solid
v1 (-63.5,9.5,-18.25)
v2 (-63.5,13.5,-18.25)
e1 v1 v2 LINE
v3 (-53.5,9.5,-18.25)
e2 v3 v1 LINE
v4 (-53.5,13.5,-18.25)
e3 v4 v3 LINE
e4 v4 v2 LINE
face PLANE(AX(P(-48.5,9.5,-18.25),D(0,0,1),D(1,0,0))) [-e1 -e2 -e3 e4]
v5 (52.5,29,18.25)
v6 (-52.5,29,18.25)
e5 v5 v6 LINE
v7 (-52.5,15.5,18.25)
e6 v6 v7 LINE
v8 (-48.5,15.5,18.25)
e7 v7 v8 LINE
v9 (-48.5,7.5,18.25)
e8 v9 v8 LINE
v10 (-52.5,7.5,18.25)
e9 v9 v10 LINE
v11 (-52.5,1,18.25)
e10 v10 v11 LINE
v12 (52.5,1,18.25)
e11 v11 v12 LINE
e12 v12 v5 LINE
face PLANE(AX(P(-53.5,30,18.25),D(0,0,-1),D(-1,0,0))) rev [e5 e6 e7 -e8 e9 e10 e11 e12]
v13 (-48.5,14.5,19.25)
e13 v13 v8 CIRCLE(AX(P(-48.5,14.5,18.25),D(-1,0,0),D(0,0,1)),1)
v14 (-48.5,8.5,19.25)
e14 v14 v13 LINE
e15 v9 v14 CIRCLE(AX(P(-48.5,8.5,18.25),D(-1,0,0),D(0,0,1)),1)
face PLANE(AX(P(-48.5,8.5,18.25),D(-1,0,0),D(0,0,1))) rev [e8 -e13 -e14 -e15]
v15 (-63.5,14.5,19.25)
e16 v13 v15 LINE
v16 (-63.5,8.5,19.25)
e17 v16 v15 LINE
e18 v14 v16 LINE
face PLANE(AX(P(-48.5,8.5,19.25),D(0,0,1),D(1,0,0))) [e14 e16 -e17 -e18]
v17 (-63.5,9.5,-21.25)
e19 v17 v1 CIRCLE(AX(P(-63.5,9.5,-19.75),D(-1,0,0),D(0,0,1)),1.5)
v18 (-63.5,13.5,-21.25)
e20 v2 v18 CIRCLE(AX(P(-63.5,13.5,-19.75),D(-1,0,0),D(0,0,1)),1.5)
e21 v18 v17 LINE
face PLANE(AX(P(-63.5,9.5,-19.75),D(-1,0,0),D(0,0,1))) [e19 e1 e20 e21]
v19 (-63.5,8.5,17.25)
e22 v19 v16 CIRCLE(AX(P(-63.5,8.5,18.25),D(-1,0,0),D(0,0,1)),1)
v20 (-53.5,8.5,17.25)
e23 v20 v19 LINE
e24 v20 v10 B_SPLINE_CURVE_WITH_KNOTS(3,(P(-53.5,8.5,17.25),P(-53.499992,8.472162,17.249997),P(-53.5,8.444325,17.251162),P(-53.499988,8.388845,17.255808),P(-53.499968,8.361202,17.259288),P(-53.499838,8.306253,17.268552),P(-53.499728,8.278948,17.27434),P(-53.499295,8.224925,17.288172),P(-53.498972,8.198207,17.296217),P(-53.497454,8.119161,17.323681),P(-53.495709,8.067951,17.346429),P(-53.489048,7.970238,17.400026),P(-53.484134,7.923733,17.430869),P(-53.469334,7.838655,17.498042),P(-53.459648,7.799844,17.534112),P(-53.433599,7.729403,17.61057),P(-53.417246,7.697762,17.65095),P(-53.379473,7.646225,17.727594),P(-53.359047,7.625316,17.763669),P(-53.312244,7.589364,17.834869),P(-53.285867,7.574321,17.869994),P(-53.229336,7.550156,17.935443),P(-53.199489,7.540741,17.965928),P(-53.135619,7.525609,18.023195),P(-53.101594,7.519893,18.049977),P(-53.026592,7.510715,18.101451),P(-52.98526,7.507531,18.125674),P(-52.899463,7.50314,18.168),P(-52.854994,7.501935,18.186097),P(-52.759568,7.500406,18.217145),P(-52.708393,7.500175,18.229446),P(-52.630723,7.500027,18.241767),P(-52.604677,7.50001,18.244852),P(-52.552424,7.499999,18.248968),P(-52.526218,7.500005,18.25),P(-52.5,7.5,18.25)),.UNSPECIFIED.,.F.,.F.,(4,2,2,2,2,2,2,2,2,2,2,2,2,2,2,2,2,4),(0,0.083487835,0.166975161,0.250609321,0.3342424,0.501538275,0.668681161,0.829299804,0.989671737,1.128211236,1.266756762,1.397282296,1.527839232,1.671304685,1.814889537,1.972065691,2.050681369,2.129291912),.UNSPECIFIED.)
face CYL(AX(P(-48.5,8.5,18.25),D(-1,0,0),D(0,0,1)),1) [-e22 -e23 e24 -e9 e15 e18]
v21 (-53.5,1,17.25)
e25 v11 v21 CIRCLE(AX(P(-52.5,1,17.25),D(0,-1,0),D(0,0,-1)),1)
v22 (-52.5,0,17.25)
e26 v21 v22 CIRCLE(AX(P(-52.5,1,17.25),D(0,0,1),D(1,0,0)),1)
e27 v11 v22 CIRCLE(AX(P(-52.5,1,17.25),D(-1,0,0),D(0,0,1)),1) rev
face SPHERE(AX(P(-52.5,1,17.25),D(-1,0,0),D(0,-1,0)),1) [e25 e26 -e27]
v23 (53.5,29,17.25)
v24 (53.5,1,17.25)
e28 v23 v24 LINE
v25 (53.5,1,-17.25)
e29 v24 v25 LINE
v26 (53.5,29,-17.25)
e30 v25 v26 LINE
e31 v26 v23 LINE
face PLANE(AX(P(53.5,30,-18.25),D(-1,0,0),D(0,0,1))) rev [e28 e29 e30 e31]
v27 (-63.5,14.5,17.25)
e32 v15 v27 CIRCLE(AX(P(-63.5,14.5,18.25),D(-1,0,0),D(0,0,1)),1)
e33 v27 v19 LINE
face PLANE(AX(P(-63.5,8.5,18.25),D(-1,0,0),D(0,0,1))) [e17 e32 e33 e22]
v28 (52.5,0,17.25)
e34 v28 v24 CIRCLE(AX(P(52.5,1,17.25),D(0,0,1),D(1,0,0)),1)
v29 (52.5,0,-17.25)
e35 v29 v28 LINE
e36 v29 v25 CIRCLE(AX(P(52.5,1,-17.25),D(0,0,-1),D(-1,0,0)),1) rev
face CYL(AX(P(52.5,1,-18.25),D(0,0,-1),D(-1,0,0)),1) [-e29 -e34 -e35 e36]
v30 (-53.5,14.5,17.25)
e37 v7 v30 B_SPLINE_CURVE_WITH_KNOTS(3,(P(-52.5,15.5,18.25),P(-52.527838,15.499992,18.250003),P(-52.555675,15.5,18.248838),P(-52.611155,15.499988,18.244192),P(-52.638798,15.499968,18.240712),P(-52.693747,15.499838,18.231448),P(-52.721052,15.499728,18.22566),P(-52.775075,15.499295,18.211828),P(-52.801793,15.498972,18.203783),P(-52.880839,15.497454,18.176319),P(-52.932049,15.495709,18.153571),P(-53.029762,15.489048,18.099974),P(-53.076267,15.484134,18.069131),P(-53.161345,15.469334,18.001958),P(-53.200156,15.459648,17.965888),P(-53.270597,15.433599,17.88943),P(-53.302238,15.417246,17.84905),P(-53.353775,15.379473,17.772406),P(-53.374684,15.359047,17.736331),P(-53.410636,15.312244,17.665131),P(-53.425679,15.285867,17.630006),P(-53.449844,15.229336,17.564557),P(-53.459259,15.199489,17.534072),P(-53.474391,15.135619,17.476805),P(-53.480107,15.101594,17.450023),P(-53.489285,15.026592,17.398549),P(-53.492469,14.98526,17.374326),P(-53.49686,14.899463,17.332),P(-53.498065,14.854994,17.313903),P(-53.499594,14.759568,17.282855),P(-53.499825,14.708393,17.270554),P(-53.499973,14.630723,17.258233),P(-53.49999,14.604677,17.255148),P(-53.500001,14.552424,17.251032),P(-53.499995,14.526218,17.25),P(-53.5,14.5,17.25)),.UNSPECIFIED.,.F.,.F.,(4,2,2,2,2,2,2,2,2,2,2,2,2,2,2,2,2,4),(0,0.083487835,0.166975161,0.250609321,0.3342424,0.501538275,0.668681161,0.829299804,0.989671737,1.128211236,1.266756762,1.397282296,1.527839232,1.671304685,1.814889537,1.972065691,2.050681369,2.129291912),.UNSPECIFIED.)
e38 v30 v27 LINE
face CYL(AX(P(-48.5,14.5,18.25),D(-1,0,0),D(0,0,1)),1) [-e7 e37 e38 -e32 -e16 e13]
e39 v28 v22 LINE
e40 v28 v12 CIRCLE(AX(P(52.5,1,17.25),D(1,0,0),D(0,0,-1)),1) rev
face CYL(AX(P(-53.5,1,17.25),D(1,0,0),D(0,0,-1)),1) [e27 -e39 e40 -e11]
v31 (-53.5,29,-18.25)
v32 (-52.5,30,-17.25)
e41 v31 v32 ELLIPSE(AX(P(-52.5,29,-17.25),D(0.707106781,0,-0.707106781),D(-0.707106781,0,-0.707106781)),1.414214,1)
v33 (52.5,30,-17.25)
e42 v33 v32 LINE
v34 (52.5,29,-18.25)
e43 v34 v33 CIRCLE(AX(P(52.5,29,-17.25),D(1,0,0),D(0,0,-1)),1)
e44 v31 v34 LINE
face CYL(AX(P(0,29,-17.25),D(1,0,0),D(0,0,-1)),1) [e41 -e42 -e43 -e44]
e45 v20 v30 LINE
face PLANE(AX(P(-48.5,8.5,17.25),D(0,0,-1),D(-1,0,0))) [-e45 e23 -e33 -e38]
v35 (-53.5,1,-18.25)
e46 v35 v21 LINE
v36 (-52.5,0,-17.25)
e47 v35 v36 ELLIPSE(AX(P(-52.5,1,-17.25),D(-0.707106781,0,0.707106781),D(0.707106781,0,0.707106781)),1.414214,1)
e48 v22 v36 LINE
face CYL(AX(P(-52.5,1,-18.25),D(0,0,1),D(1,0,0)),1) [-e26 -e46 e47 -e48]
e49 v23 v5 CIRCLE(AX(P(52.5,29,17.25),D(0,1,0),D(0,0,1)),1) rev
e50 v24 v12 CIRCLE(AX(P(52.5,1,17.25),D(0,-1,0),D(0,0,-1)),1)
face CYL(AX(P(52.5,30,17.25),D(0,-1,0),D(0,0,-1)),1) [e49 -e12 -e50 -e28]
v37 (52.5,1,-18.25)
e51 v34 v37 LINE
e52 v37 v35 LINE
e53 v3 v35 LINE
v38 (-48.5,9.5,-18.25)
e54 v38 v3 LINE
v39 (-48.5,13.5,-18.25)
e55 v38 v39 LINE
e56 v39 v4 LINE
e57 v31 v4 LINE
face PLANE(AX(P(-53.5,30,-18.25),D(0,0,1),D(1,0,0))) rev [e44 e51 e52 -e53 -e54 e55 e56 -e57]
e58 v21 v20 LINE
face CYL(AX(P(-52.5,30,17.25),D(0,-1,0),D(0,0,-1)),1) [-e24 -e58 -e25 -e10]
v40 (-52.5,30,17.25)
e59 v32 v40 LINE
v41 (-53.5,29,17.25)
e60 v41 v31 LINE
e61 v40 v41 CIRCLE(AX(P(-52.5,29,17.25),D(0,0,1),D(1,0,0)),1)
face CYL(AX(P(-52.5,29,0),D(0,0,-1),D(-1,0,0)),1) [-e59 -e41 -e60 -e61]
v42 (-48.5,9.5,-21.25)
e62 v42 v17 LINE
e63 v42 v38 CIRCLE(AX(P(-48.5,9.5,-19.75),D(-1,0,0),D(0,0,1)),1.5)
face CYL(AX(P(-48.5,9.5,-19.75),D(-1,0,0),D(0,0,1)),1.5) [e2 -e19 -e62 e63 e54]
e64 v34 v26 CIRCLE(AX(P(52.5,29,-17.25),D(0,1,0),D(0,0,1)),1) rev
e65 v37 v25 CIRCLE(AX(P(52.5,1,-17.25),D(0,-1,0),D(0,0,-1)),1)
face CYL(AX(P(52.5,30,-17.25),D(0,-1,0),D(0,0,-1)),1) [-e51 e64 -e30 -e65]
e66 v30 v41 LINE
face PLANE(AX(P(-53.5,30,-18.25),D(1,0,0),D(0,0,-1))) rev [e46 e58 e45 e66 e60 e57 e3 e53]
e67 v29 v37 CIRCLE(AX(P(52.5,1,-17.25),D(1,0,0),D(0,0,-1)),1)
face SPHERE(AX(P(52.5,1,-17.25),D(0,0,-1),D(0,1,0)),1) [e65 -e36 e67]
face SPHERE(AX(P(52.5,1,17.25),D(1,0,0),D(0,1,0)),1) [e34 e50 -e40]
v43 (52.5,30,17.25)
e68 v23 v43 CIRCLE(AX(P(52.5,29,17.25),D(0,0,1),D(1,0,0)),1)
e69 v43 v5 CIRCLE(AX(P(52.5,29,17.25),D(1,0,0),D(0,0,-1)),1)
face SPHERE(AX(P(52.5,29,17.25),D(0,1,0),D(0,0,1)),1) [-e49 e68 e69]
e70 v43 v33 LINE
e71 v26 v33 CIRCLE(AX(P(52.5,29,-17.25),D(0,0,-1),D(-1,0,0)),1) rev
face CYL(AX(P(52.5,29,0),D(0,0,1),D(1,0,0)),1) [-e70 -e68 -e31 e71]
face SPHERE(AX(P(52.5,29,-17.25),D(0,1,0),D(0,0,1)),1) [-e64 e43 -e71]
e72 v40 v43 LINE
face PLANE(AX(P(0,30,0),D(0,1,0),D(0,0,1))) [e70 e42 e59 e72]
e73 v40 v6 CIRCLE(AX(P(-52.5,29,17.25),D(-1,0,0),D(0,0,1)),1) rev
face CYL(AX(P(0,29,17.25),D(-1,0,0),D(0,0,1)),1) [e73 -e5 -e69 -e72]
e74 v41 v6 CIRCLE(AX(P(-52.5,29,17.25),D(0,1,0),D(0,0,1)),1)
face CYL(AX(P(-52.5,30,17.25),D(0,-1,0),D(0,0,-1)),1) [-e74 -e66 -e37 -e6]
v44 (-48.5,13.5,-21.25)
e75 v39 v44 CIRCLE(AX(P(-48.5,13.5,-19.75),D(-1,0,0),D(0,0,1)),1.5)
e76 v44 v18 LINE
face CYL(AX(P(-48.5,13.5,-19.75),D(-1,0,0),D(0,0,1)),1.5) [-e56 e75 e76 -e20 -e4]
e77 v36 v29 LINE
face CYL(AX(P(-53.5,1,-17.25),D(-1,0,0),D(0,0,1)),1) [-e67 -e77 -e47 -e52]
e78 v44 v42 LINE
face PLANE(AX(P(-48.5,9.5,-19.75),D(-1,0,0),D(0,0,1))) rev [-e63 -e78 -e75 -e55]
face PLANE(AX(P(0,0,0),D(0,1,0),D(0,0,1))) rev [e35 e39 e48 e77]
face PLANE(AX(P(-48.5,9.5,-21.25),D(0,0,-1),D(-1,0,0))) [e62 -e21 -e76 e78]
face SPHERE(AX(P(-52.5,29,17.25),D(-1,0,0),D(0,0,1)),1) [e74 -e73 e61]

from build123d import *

# Parameters (mm, degrees)
SKETCH1_W            = 107
SKETCH1_H            = 36.5
BATTERY_DEPTH        = 30
CABLES_DEPTH         = 10
CABLES_DEPTH_BACK    = 5
F_1MM_EDGE_FILLETS_R = 1


with BuildPart() as part:
    # Sketch1 → Battery (new body)
    with BuildSketch(Plane(origin=(0, 0, 0), x_dir=(1, 0, 0), z_dir=(0, 1, 0))):
        Rectangle(SKETCH1_W, SKETCH1_H)
    extrude(amount=BATTERY_DEPTH)

    # Sketch2 → Cables (add, two sides: drawn at the far end of the back side and taken through both)
    with BuildSketch(Plane.ZY.offset(53.5).offset(-CABLES_DEPTH_BACK)):
        with BuildLine():
            Line((-21.25, 9.5), (-21.25, 13.5))
            ThreePointArc((-21.25, 13.5), (-19.75, 15), (-18.25, 13.5))
            Line((-18.25, 13.5), (-18.25, 9.5))
            ThreePointArc((-18.25, 9.5), (-19.75, 8), (-21.25, 9.5))
        make_face()
        with BuildLine():
            Line((17.25, 8.5), (17.25, 14.5))
            ThreePointArc((17.25, 14.5), (18.25, 15.5), (19.25, 14.5))
            Line((19.25, 14.5), (19.25, 8.5))
            ThreePointArc((19.25, 8.5), (18.25, 7.5), (17.25, 8.5))
        make_face()
    extrude(amount=CABLES_DEPTH + CABLES_DEPTH_BACK)

    # 1mm Edge Fillets
    f_1mm_edge_fillets_edges = [part.edges().sort_by_distance(p)[0] for p in [
        (0, 0, 18.25),
        (0, 0, -18.25),
        (-53.5, 0, 0),
        (0, 30, -18.25),
        (0, 30, 18.25),
        (-53.5, 30, 0),
        (53.5, 15, 18.25),
        (53.5, 30, 0),
        (53.5, 15, -18.25),
        (53.5, 0, 0),
        (-53.5, 3.75, 18.25),
        (-53.5, 22.75, 18.25),
    ]]
    fillet(f_1mm_edge_fillets_edges, radius=F_1MM_EDGE_FILLETS_R - 0.0001)  # a hair under: the kernel refuses the full size


solid = part.part
